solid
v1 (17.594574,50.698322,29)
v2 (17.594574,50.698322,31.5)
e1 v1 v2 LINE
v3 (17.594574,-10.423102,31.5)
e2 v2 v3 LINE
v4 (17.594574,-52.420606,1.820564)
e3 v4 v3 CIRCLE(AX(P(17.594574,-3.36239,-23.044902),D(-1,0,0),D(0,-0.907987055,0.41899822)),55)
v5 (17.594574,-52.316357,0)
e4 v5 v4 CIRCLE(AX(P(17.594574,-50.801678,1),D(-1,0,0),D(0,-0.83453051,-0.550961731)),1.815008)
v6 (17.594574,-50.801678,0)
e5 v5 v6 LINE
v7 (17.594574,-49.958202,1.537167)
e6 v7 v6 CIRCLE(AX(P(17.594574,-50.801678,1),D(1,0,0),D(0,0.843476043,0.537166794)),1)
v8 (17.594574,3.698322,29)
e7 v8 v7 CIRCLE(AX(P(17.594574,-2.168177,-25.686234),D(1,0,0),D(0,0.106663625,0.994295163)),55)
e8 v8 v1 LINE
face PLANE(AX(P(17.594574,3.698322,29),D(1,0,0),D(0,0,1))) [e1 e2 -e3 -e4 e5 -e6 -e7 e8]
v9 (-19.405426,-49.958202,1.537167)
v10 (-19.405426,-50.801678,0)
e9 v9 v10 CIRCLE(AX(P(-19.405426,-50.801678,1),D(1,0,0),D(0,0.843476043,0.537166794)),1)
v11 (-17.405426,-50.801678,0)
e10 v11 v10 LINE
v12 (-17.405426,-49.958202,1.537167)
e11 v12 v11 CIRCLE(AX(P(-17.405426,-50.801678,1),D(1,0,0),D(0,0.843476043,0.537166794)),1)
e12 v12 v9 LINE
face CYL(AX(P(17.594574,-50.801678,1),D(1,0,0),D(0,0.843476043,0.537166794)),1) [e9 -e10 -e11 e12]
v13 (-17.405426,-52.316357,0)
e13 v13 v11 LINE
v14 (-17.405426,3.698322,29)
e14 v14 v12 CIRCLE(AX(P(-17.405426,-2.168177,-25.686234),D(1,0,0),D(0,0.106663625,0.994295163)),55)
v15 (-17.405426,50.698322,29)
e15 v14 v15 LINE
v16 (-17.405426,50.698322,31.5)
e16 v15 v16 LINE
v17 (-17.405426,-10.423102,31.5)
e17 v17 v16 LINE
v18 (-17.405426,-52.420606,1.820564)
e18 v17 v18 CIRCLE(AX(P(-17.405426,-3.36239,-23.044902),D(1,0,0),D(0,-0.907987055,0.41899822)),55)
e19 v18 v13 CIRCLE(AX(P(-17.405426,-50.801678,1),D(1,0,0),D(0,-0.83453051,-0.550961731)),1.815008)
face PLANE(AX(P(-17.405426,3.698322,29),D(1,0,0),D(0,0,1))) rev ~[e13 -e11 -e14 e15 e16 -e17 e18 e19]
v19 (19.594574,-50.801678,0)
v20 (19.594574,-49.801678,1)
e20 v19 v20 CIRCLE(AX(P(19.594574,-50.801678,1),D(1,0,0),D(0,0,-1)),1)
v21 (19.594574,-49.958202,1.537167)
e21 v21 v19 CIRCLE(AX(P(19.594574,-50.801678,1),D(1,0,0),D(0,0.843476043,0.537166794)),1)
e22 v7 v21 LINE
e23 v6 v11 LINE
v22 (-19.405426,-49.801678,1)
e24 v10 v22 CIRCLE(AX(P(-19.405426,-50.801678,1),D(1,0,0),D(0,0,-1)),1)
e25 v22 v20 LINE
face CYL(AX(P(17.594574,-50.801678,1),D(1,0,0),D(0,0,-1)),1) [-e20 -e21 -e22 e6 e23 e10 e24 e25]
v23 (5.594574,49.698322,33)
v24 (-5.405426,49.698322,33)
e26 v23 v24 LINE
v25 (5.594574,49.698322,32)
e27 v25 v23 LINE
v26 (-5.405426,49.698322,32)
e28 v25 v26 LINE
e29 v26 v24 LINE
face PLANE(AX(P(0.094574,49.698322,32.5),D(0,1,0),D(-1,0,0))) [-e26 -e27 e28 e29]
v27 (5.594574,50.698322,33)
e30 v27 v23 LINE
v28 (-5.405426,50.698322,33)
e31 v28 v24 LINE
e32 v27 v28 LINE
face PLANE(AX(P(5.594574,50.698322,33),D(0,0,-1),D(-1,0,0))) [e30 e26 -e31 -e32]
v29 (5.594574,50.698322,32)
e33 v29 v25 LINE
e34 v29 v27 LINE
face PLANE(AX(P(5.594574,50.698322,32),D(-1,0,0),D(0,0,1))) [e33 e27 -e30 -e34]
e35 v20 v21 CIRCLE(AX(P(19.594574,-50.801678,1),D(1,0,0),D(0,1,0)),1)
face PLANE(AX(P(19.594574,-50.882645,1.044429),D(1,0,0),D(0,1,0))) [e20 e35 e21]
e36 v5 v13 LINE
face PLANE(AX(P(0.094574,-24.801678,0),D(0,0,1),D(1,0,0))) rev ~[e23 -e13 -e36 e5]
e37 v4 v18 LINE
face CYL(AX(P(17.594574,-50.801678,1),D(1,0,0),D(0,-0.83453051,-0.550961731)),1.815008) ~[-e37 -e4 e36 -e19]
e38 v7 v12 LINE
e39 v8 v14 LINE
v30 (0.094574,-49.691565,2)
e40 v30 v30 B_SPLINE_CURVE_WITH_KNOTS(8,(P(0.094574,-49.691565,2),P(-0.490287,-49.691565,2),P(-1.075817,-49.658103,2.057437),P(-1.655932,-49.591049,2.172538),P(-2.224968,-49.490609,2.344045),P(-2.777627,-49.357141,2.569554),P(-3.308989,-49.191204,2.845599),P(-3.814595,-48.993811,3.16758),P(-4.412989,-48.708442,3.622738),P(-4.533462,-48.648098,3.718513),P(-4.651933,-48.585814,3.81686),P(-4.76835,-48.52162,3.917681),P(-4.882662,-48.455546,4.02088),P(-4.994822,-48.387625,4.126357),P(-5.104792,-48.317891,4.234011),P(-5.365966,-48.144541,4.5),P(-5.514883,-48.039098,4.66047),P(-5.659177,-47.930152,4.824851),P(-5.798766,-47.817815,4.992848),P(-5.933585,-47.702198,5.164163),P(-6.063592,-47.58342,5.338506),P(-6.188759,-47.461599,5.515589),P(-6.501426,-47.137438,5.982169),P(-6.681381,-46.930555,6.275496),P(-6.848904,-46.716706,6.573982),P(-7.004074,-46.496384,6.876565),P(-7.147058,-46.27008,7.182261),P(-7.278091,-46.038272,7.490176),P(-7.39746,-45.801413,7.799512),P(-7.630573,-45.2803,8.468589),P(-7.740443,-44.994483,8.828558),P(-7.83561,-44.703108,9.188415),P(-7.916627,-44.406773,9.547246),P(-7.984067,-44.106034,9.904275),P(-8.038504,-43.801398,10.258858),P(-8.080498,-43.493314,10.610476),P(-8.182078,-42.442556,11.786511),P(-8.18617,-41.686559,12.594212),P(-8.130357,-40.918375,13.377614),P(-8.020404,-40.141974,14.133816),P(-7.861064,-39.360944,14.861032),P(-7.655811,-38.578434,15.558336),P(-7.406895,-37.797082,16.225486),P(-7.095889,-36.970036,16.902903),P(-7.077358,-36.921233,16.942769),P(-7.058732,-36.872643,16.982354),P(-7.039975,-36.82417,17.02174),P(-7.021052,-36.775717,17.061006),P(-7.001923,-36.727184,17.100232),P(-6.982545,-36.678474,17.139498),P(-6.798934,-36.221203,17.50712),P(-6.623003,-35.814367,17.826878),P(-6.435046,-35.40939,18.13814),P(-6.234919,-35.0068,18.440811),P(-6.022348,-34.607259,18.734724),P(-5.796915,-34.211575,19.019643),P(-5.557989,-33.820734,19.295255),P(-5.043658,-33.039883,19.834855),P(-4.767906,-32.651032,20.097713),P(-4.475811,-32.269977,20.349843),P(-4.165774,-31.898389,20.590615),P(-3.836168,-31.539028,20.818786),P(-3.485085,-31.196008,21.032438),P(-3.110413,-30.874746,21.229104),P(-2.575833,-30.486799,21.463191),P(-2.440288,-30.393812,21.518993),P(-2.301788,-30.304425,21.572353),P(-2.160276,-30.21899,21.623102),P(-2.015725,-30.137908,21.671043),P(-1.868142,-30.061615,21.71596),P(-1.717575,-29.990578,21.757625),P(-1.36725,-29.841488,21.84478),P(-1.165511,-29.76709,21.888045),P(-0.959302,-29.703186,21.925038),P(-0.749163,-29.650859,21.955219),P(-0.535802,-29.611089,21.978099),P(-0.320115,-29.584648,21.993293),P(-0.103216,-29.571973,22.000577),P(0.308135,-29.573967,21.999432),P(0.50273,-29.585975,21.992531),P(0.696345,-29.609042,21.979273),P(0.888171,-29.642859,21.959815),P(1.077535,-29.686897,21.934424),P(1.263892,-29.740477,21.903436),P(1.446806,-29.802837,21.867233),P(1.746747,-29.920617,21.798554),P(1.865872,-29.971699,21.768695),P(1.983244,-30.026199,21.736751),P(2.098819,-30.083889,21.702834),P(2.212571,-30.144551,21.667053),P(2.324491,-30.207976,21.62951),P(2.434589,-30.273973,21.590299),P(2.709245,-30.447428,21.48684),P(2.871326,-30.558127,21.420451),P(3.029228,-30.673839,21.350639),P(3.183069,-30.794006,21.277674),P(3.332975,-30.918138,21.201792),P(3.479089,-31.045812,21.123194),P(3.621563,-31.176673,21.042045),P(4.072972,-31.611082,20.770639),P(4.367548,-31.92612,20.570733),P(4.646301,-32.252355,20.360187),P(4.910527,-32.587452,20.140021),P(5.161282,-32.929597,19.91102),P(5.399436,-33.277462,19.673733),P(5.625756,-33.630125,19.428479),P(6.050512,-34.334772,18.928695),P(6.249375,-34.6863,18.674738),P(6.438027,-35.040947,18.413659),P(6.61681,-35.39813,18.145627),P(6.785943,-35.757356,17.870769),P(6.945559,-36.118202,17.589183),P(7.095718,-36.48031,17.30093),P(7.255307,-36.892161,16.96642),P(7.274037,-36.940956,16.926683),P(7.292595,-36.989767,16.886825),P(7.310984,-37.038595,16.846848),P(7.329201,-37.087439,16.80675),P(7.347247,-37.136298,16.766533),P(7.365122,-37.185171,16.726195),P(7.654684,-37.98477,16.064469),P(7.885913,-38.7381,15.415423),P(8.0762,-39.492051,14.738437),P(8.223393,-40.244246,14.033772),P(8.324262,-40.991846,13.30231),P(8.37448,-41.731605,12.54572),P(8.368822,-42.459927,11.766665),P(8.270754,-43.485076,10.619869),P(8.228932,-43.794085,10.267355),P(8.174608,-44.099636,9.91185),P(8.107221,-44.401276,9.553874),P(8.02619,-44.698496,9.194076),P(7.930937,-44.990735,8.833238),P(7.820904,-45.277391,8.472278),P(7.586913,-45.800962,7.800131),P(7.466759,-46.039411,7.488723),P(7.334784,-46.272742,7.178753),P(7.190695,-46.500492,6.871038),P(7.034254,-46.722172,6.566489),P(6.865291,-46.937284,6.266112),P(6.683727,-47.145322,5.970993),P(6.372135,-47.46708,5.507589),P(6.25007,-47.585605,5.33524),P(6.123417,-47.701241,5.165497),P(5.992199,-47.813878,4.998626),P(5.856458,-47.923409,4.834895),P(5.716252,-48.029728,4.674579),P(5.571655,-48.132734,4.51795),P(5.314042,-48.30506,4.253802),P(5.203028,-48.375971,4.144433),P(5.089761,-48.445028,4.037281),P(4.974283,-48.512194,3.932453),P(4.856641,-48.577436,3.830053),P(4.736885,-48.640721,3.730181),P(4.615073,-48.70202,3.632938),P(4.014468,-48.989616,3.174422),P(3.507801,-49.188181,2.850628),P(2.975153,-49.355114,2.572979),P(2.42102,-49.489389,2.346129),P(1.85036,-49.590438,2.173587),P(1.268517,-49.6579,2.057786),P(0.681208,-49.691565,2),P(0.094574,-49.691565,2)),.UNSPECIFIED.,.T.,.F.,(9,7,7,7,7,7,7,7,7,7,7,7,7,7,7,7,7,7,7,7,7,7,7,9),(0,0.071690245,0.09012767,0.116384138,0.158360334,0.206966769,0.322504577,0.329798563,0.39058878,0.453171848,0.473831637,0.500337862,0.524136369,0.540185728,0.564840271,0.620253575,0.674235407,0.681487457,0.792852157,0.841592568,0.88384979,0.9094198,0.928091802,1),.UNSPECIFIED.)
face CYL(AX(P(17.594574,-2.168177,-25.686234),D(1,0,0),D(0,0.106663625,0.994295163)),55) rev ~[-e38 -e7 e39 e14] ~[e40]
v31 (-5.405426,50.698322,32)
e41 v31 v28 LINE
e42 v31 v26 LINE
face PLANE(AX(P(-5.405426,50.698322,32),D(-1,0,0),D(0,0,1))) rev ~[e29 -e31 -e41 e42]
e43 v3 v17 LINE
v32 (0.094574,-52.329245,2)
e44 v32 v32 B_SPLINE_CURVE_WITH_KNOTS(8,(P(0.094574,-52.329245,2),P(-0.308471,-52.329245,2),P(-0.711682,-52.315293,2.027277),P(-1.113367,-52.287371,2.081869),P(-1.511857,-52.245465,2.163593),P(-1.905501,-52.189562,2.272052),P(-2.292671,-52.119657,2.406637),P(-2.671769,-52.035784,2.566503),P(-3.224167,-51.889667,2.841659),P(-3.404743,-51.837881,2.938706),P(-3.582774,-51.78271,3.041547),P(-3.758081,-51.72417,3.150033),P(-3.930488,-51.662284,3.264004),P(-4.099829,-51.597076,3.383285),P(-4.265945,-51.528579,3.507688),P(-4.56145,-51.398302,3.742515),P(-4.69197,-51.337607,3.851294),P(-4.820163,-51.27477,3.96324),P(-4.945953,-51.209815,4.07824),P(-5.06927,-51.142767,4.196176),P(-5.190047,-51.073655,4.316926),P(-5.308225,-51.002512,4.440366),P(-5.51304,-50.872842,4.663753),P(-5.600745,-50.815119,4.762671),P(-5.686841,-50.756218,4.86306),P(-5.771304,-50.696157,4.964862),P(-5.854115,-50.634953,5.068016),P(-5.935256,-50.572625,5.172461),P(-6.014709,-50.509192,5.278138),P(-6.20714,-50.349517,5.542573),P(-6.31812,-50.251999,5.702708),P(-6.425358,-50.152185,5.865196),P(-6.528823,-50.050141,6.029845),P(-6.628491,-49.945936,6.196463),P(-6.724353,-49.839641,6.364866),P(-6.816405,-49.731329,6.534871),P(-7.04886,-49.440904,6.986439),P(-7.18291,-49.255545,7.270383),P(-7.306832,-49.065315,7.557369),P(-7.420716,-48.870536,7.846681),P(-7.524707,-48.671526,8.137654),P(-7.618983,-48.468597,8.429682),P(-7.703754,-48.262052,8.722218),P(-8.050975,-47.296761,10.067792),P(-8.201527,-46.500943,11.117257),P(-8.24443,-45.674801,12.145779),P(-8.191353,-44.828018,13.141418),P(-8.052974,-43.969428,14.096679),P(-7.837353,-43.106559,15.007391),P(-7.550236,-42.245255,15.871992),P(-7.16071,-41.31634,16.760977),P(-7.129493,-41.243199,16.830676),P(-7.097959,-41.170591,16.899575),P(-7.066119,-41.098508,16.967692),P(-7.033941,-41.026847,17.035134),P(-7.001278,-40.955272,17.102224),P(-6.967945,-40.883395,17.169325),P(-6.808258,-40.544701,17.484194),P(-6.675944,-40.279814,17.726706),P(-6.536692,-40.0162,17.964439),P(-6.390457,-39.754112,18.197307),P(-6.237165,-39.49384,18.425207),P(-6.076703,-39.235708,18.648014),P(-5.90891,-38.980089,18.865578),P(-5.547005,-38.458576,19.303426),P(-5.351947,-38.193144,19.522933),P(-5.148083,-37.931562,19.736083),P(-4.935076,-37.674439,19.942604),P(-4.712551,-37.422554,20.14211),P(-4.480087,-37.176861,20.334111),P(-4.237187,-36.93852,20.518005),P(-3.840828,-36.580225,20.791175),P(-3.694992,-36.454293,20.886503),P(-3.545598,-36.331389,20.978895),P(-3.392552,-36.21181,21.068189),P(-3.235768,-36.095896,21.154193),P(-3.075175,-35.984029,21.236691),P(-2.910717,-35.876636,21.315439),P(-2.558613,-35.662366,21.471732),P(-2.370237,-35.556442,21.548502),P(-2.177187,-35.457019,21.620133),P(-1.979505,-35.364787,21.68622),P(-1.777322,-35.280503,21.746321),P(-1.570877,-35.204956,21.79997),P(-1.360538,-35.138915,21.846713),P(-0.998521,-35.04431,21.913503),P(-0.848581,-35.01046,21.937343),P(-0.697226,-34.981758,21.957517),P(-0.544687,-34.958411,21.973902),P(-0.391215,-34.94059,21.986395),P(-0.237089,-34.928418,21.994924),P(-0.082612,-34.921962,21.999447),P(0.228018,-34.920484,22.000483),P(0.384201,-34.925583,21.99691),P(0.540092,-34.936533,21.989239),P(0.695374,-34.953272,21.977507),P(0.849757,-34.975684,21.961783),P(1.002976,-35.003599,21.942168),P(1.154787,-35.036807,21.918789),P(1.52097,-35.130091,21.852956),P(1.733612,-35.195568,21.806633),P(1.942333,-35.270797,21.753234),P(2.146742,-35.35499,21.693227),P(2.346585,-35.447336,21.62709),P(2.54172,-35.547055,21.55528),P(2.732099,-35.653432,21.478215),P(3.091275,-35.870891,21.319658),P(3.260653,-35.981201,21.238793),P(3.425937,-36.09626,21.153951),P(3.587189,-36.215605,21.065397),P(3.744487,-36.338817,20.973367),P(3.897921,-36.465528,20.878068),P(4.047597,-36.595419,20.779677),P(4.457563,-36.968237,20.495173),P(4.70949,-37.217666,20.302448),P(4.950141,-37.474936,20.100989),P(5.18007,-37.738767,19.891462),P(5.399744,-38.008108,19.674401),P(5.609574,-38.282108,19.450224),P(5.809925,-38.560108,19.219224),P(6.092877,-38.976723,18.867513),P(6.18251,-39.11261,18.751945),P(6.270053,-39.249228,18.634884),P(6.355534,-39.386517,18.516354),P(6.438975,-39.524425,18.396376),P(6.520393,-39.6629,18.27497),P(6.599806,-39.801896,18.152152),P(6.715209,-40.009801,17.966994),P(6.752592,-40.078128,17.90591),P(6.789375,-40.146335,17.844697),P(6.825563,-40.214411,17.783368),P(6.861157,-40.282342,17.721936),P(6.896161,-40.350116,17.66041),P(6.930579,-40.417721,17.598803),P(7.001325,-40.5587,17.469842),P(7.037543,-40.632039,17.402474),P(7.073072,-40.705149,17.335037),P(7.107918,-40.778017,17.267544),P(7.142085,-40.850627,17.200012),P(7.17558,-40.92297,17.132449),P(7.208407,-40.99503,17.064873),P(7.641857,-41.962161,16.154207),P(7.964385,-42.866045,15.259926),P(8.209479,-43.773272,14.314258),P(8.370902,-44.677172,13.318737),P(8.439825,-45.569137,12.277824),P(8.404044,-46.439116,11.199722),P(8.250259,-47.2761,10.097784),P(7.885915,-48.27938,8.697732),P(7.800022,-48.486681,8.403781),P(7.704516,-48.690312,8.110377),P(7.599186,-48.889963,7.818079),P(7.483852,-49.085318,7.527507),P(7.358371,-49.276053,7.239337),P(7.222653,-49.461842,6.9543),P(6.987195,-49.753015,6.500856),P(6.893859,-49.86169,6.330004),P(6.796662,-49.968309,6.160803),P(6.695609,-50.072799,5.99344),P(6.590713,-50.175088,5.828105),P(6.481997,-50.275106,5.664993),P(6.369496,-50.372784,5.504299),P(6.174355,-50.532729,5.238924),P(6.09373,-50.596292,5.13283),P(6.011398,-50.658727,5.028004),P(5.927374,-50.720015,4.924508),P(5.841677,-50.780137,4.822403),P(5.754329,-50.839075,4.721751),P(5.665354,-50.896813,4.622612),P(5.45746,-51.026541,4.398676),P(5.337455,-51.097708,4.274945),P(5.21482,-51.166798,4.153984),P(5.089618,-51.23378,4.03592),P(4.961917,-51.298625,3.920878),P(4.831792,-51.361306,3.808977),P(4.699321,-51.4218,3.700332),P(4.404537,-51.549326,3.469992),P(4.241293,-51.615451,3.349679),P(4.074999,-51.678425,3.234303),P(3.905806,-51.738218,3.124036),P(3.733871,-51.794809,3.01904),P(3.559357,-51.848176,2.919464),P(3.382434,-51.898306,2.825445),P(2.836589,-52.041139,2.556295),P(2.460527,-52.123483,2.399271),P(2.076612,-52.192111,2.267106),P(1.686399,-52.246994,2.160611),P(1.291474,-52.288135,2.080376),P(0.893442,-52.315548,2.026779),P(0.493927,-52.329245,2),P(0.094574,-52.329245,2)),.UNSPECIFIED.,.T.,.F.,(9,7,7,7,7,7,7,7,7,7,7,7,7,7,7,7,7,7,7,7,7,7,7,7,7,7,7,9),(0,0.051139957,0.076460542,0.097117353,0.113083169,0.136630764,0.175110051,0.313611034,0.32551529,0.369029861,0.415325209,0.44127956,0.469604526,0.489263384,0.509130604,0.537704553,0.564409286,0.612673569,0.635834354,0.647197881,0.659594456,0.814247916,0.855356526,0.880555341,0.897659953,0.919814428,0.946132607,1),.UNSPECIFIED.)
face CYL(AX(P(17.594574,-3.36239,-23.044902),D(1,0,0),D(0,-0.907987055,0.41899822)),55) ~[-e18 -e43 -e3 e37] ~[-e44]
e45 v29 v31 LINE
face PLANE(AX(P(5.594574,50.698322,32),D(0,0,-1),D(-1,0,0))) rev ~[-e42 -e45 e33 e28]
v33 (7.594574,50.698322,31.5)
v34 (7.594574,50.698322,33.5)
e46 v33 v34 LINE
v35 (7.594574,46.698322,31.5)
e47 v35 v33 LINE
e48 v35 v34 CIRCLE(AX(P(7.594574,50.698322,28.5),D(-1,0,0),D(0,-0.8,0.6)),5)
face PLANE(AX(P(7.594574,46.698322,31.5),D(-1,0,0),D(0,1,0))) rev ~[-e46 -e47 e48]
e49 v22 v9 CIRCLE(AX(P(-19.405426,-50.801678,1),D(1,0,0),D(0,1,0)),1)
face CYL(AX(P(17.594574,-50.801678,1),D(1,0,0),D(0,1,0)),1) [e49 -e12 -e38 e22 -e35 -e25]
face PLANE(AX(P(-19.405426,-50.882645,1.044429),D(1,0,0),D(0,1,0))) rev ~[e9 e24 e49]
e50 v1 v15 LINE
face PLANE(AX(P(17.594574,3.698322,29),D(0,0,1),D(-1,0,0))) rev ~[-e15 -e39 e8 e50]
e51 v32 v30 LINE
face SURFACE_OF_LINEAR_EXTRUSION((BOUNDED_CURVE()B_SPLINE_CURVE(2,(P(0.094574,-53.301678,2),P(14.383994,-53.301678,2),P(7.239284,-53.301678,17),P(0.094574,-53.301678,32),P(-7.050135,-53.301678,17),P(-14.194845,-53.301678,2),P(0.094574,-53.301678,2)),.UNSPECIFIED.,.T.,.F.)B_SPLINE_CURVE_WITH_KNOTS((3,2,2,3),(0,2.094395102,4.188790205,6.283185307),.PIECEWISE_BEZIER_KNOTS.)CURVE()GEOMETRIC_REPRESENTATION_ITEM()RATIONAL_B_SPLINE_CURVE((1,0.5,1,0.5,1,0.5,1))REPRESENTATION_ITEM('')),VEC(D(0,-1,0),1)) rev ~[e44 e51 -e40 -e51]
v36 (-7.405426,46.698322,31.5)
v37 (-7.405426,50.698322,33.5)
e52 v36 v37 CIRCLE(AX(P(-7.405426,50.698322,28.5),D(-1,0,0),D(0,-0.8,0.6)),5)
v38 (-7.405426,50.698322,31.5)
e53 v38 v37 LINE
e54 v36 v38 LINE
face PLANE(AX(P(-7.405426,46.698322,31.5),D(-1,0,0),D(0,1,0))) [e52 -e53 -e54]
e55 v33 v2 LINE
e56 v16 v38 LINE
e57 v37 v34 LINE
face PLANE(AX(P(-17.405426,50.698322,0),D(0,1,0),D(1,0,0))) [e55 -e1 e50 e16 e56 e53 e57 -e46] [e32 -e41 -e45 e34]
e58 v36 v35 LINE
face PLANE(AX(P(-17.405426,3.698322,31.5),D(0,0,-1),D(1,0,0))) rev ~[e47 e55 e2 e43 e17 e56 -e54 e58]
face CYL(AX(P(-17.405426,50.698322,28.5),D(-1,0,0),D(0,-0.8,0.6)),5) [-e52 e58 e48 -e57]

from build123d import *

# Parameters (mm, degrees)
F0_W          = 35
F0_H          = 57
F1_DEPTH      = 31.5
F4_DEPTH      = 57.001
F5_DEPTH      = 35.0010001
F7_DEPTH      = 35.0010001
F9_DEPTH      = 2
F9_DEPTH_BACK = 37
F11_DEPTH     = 37.001
F12_DEPTH     = 47
F13_W         = 15
F13_H         = 4
F14_DEPTH     = 2
F15_T1_DEPTH  = 35
F16_W         = 11
F16_H         = 1
F17_DEPTH     = 1


# Not quite as in the source:
# - a fillet or chamfer that OpenCascade refuses, or shapes differently, is made with other operations: its cross-section is extruded or revolved along the edge and cut away or added


with BuildPart() as f1:
    # F0 (on Top) → F1 (new body)
    with BuildSketch(Plane.XY):
        with Locations((0.0945744105, -24.8016776452)):
            Rectangle(F0_W, F0_H)
    extrude(amount=F1_DEPTH)

    # F3 (on face) → F4 (cut, through all)
    with BuildSketch(Plane.XZ.offset(53.3016776452)):
        with BuildLine():
            add(Edge.make_bspline(
                [(0.0945744105, 2), (14.3839935729, 2), (7.2392839917, 17), (0.0945744105, 32), (-7.0501351708, 17), (-14.194844752, 2), (0.0945744105, 2)],
                knots=[0, 0, 0, 2.0943951024, 2.0943951024, 4.1887902048, 4.1887902048, 6.2831853072, 6.2831853072, 6.2831853072], degree=2, weights=[1, 0.5, 1, 0.5, 1, 0.5, 1]))
        make_face()
    extrude(amount=-F4_DEPTH, mode=Mode.SUBTRACT)

    # F2 (on face) → F5 (cut, through all)
    with BuildSketch(Plane.YZ.offset(17.5945744105)):
        with BuildLine():
            ThreePointArc((-53.3016776452, 0), (-35.9248296563, 21.279893434), (-10.4231016291, 31.5))
            Line((-10.4231016291, 31.5), (-53.3016776452, 31.5))
            Line((-53.3016776452, 31.5), (-53.3016776452, 0))
        make_face()
    extrude(amount=-F5_DEPTH, mode=Mode.SUBTRACT)

    # F6 (on face) → F7 (cut, through all)
    with BuildSketch(Plane.YZ.offset(17.5945744105)):
        with BuildLine():
            Line((3.6983223548, 0), (3.6983223548, 29))
            ThreePointArc((3.6983223548, 29), (-28.0042777095, 22.8678173622), (-50.8016776452, 0))
            Line((-50.8016776452, 0), (3.6983223548, 0))
        make_face()
    extrude(amount=-F7_DEPTH, mode=Mode.SUBTRACT)

    # F8 (on face) → F9 (join, two sides)
    with BuildSketch(Plane.YZ.offset(17.5945744105)) as f9_sk:
        with BuildLine():
            ThreePointArc((-49.9582016017, 1.5371667936), (-51.6783665277, 1.4810577961), (-50.8016776452, 0))
            ThreePointArc((-50.8016776452, 0), (-50.3860655446, 0.7719448198), (-49.9582016017, 1.5371667936))
        make_face()
        with BuildLine():
            ThreePointArc((-49.9582016017, 1.5371667936), (-50.3860655446, 0.7719448198), (-50.8016776452, 0))
            ThreePointArc((-50.8016776452, 0), (-50.094570864, 0.2928932188), (-49.8016776452, 1))
            ThreePointArc((-49.8016776452, 1), (-49.8416057615, 1.2797534241), (-49.9582016017, 1.5371667936))
        make_face()
    extrude(amount=F9_DEPTH)
    extrude(f9_sk.sketch, amount=-F9_DEPTH_BACK)

    # F10 (on face) → F11 (cut, through all)
    with BuildSketch(Plane.YZ.offset(17.5945744105)):
        with BuildLine():
            Line((-53.3016776452, 0), (-52.3163572735, 0))
            ThreePointArc((-52.3163572735, 0), (-52.6137174082, 0.8962393447), (-52.4206060402, 1.8205639696))
            ThreePointArc((-52.4206060402, 1.8205639696), (-52.8695111773, 0.9143323688), (-53.3016776452, 0))
        make_face()
    extrude(amount=-F11_DEPTH, mode=Mode.SUBTRACT)

    # F12 (add): a face of the model
    f12_faces = [f1.faces().sort_by_distance(p)[0] for p in [
        (0.0945744105, 3.6983223548, 30.25),
    ]]
    extrude(f12_faces, amount=F12_DEPTH)

    # F13 (on face) → F14 (join)
    with BuildSketch(Plane.XY.offset(31.5)):
        with Locations((0.0945744105, 48.6983223548)):
            Rectangle(F13_W, F13_H)
    extrude(amount=F14_DEPTH)

    # F15: fillet of radius 5 on 1 edges, made by hand

    # F15_s2 → F15_t1 (cut)
    with BuildSketch(Plane.YZ.offset(-17.4054255895)):
        with BuildLine():
            ThreePointArc((46.6983223548, 31.5), (48.4622543773, 32.972135955), (50.6983223548, 33.5))
            Line((50.6983223548, 33.5), (46.6983223548, 33.5))
            Line((46.6983223548, 33.5), (46.6983223548, 31.5))
        make_face()
    extrude(amount=F15_T1_DEPTH, mode=Mode.SUBTRACT)

    # F16 (on face) → F17 (cut)
    with BuildSketch(Plane(origin=(0, 50.6983223548, 0), x_dir=(-1, 0, 0), z_dir=(0, 1, 0))):
        with Locations((-0.0945744105, 32.5)):
            Rectangle(F16_W, F16_H)
    extrude(amount=-F17_DEPTH, mode=Mode.SUBTRACT)


solid = f1.part
